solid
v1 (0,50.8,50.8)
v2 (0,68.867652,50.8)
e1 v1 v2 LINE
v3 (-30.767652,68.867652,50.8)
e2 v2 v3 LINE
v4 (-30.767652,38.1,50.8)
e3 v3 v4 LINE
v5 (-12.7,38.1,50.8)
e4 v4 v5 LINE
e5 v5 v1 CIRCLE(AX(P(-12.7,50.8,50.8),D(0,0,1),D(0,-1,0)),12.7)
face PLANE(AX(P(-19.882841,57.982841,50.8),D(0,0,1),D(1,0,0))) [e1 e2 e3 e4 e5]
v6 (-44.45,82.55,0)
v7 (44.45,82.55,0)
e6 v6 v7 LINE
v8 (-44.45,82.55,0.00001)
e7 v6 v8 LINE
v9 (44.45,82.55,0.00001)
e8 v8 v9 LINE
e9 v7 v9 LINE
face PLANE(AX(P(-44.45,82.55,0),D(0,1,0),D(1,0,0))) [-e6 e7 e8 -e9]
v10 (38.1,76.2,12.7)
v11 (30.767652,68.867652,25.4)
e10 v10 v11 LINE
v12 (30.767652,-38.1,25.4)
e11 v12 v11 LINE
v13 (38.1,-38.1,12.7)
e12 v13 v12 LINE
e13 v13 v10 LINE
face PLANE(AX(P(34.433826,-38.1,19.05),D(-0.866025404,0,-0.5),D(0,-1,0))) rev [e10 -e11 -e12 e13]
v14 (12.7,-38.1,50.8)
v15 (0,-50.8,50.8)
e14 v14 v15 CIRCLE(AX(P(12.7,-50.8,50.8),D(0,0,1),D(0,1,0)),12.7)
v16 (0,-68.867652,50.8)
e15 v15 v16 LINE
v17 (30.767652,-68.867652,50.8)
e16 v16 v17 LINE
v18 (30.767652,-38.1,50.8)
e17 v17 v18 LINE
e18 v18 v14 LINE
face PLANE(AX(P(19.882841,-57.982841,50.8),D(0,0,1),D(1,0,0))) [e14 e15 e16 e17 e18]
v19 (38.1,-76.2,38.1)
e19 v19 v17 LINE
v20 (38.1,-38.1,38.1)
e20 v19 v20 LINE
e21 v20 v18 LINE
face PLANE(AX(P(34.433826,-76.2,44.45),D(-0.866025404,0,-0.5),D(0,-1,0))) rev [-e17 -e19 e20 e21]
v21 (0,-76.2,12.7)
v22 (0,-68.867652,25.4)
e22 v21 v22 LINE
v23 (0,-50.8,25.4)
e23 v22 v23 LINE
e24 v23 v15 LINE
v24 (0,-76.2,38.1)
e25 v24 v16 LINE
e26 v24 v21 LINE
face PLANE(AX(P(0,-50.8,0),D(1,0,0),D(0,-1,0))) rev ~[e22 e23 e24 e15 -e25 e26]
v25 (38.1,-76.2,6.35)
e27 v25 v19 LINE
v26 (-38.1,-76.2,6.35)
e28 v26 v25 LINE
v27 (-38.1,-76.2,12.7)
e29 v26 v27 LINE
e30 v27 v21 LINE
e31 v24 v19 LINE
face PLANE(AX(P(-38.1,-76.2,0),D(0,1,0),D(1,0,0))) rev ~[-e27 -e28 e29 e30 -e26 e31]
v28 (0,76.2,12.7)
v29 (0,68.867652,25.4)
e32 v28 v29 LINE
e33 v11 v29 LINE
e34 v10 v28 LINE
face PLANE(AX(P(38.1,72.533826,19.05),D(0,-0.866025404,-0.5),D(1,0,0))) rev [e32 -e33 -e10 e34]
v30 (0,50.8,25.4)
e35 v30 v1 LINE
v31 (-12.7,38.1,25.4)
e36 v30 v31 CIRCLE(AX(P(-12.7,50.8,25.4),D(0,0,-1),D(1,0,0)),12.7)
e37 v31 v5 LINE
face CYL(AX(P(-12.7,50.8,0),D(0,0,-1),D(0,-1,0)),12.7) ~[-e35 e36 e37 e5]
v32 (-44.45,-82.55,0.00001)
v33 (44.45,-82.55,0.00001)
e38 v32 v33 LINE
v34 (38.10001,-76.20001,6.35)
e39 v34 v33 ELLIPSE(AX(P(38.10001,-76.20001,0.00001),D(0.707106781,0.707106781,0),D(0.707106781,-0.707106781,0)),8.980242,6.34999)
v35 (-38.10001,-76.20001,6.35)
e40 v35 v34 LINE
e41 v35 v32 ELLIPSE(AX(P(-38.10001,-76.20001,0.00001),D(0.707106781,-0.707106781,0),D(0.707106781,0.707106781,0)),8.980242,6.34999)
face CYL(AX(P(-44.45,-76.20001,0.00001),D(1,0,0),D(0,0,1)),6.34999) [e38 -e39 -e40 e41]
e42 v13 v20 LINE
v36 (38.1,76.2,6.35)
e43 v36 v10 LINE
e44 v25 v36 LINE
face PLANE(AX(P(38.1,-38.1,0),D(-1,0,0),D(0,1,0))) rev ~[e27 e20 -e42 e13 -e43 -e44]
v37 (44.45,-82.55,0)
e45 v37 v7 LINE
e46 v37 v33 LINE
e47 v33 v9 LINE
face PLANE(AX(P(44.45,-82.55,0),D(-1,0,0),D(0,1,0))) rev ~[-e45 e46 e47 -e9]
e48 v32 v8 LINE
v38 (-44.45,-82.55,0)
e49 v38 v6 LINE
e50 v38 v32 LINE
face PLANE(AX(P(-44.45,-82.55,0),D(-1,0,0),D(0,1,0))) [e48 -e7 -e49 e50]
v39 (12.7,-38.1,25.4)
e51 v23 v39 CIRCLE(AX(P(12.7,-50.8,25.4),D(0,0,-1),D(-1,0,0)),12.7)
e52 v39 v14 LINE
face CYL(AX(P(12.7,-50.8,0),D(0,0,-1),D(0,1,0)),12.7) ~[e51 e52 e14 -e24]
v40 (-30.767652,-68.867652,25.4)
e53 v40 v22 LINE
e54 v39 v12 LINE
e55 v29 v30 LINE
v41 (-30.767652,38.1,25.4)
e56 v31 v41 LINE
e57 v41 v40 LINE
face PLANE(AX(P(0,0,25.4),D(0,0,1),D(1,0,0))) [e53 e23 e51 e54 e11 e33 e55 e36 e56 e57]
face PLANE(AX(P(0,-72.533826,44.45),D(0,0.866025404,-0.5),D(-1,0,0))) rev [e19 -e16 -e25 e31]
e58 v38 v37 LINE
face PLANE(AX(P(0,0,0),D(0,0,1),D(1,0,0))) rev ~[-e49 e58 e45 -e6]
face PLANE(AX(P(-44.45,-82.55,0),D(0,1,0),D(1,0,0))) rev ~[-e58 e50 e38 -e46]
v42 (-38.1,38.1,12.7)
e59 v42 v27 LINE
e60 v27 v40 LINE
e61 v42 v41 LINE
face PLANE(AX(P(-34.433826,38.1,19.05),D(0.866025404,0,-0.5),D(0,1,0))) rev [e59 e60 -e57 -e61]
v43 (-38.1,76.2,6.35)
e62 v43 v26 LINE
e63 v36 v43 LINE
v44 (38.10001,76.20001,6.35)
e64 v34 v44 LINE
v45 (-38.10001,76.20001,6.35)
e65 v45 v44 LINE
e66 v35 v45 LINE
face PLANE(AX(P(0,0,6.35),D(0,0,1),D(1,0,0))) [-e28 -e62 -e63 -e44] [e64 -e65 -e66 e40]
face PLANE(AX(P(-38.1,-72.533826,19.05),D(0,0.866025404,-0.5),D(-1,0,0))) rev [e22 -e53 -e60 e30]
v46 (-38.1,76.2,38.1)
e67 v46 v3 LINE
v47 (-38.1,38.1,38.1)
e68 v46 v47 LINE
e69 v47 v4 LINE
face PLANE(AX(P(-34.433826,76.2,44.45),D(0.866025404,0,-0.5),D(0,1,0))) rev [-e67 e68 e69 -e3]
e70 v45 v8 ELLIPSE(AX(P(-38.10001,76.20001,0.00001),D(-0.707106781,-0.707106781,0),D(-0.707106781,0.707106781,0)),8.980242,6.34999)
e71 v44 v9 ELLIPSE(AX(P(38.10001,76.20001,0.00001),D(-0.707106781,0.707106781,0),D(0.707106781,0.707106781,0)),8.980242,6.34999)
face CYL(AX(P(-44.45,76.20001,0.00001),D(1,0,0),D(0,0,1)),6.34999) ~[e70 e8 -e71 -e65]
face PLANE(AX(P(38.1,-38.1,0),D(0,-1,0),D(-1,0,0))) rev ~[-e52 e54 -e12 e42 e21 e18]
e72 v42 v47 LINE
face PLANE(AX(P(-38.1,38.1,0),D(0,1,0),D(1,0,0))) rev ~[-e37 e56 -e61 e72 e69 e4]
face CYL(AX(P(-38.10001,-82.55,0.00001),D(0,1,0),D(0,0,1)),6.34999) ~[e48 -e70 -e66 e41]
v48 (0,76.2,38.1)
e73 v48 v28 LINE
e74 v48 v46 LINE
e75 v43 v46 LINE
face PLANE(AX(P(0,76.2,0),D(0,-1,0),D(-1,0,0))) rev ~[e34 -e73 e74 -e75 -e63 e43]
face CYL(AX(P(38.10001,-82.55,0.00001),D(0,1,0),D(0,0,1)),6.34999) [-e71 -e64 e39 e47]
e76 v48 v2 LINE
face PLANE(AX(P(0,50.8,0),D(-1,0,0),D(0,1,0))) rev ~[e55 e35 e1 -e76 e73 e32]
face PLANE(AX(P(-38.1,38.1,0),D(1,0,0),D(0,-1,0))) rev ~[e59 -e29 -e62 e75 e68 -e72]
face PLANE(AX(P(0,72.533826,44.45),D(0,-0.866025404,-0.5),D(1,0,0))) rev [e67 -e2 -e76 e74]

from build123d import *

# Parameters (mm, degrees)
F0_W     = 88.9
F0_H     = 165.1
F1_DEPTH = 6.35
F2_DEPTH = 25.4
F3_DEPTH = 50.8
F4_R     = 6.34999
F5_SIZE2 = 7.3323484187
F5_SIZE  = 12.7
F6_SIZE2 = 7.3323484187
F6_SIZE  = 12.7


# Not quite as in the source:
# - a fillet or chamfer is up to 0.001 mm smaller than in the source, because OpenCascade refuses the exact size


with BuildPart() as f1:
    # F0 (on Top) → F1 (new body)
    with BuildSketch(Plane.XY):
        Rectangle(F0_W, F0_H)
        Polygon((0, 76.2), (38.1, 76.2), (38.1, -38.1), (38.1, -76.2), (0, -76.2), (-38.1, -76.2), (-38.1, 38.1), (-38.1, 76.2), align=None, mode=Mode.SUBTRACT)
    extrude(amount=F1_DEPTH)

    # F0 (on Top) → F2 (join)
    with BuildSketch(Plane.XY):
        with BuildLine():
            Line((38.1, -38.1), (38.1, 76.2))
            Line((38.1, 76.2), (0, 76.2))
            Line((0, 76.2), (0, 50.8))
            ThreePointArc((0, 50.8), (-3.7197438789, 41.8197438789), (-12.7, 38.1))
            Line((-12.7, 38.1), (-38.1, 38.1))
            Line((-38.1, 38.1), (-38.1, -76.2))
            Line((-38.1, -76.2), (0, -76.2))
            Line((0, -76.2), (0, -50.8))
            ThreePointArc((0, -50.8), (3.7197438789, -41.8197438789), (12.7, -38.1))
            Line((12.7, -38.1), (38.1, -38.1))
        make_face()
    extrude(amount=F2_DEPTH)

    # F0 (on Top) → F3 (join)
    with BuildSketch(Plane.XY):
        with BuildLine():
            Line((0, 50.8), (0, 76.2))
            Line((0, 76.2), (-38.1, 76.2))
            Line((-38.1, 76.2), (-38.1, 38.1))
            Line((-38.1, 38.1), (-12.7, 38.1))
            ThreePointArc((-12.7, 38.1), (-3.7197438789, 41.8197438789), (0, 50.8))
        make_face()
        with BuildLine():
            Line((38.1, -76.2), (38.1, -38.1))
            Line((38.1, -38.1), (12.7, -38.1))
            ThreePointArc((12.7, -38.1), (3.7197438789, -41.8197438789), (0, -50.8))
            Line((0, -50.8), (0, -76.2))
            Line((0, -76.2), (38.1, -76.2))
        make_face()
    extrude(amount=F3_DEPTH)

    # F4 (radius 6.35 in the source; OpenCascade refuses exactly that, so slightly less here)
    f4_edges = [f1.edges().sort_by_distance(p)[0] for p in [
        (-44.45, 0, 6.35),
        (0, -82.55, 6.35),
        (44.45, 0, 6.35),
        (0, 82.55, 6.35),
    ]]
    fillet(f4_edges, radius=F4_R)

    # F5
    f5_edges = [f1.edges().sort_by_distance(p)[0] for p in [
        (38.1, 19.05, 25.4),
        (19.05, 76.2, 25.4),
        (-38.1, -19.05, 25.4),
        (-19.05, -76.2, 25.4),
        (19.05, -76.2, 50.8),
        (38.1, -57.15, 50.8),
    ]]
    chamfer(f5_edges, length=F5_SIZE, length2=F5_SIZE2)

    # F6
    f6_edges = [f1.edges().sort_by_distance(p)[0] for p in [
        (-19.05, 76.2, 50.8),
        (-38.1, 57.15, 50.8),
    ]]
    chamfer(f6_edges, length=F6_SIZE, length2=F6_SIZE2)


solid = f1.part
